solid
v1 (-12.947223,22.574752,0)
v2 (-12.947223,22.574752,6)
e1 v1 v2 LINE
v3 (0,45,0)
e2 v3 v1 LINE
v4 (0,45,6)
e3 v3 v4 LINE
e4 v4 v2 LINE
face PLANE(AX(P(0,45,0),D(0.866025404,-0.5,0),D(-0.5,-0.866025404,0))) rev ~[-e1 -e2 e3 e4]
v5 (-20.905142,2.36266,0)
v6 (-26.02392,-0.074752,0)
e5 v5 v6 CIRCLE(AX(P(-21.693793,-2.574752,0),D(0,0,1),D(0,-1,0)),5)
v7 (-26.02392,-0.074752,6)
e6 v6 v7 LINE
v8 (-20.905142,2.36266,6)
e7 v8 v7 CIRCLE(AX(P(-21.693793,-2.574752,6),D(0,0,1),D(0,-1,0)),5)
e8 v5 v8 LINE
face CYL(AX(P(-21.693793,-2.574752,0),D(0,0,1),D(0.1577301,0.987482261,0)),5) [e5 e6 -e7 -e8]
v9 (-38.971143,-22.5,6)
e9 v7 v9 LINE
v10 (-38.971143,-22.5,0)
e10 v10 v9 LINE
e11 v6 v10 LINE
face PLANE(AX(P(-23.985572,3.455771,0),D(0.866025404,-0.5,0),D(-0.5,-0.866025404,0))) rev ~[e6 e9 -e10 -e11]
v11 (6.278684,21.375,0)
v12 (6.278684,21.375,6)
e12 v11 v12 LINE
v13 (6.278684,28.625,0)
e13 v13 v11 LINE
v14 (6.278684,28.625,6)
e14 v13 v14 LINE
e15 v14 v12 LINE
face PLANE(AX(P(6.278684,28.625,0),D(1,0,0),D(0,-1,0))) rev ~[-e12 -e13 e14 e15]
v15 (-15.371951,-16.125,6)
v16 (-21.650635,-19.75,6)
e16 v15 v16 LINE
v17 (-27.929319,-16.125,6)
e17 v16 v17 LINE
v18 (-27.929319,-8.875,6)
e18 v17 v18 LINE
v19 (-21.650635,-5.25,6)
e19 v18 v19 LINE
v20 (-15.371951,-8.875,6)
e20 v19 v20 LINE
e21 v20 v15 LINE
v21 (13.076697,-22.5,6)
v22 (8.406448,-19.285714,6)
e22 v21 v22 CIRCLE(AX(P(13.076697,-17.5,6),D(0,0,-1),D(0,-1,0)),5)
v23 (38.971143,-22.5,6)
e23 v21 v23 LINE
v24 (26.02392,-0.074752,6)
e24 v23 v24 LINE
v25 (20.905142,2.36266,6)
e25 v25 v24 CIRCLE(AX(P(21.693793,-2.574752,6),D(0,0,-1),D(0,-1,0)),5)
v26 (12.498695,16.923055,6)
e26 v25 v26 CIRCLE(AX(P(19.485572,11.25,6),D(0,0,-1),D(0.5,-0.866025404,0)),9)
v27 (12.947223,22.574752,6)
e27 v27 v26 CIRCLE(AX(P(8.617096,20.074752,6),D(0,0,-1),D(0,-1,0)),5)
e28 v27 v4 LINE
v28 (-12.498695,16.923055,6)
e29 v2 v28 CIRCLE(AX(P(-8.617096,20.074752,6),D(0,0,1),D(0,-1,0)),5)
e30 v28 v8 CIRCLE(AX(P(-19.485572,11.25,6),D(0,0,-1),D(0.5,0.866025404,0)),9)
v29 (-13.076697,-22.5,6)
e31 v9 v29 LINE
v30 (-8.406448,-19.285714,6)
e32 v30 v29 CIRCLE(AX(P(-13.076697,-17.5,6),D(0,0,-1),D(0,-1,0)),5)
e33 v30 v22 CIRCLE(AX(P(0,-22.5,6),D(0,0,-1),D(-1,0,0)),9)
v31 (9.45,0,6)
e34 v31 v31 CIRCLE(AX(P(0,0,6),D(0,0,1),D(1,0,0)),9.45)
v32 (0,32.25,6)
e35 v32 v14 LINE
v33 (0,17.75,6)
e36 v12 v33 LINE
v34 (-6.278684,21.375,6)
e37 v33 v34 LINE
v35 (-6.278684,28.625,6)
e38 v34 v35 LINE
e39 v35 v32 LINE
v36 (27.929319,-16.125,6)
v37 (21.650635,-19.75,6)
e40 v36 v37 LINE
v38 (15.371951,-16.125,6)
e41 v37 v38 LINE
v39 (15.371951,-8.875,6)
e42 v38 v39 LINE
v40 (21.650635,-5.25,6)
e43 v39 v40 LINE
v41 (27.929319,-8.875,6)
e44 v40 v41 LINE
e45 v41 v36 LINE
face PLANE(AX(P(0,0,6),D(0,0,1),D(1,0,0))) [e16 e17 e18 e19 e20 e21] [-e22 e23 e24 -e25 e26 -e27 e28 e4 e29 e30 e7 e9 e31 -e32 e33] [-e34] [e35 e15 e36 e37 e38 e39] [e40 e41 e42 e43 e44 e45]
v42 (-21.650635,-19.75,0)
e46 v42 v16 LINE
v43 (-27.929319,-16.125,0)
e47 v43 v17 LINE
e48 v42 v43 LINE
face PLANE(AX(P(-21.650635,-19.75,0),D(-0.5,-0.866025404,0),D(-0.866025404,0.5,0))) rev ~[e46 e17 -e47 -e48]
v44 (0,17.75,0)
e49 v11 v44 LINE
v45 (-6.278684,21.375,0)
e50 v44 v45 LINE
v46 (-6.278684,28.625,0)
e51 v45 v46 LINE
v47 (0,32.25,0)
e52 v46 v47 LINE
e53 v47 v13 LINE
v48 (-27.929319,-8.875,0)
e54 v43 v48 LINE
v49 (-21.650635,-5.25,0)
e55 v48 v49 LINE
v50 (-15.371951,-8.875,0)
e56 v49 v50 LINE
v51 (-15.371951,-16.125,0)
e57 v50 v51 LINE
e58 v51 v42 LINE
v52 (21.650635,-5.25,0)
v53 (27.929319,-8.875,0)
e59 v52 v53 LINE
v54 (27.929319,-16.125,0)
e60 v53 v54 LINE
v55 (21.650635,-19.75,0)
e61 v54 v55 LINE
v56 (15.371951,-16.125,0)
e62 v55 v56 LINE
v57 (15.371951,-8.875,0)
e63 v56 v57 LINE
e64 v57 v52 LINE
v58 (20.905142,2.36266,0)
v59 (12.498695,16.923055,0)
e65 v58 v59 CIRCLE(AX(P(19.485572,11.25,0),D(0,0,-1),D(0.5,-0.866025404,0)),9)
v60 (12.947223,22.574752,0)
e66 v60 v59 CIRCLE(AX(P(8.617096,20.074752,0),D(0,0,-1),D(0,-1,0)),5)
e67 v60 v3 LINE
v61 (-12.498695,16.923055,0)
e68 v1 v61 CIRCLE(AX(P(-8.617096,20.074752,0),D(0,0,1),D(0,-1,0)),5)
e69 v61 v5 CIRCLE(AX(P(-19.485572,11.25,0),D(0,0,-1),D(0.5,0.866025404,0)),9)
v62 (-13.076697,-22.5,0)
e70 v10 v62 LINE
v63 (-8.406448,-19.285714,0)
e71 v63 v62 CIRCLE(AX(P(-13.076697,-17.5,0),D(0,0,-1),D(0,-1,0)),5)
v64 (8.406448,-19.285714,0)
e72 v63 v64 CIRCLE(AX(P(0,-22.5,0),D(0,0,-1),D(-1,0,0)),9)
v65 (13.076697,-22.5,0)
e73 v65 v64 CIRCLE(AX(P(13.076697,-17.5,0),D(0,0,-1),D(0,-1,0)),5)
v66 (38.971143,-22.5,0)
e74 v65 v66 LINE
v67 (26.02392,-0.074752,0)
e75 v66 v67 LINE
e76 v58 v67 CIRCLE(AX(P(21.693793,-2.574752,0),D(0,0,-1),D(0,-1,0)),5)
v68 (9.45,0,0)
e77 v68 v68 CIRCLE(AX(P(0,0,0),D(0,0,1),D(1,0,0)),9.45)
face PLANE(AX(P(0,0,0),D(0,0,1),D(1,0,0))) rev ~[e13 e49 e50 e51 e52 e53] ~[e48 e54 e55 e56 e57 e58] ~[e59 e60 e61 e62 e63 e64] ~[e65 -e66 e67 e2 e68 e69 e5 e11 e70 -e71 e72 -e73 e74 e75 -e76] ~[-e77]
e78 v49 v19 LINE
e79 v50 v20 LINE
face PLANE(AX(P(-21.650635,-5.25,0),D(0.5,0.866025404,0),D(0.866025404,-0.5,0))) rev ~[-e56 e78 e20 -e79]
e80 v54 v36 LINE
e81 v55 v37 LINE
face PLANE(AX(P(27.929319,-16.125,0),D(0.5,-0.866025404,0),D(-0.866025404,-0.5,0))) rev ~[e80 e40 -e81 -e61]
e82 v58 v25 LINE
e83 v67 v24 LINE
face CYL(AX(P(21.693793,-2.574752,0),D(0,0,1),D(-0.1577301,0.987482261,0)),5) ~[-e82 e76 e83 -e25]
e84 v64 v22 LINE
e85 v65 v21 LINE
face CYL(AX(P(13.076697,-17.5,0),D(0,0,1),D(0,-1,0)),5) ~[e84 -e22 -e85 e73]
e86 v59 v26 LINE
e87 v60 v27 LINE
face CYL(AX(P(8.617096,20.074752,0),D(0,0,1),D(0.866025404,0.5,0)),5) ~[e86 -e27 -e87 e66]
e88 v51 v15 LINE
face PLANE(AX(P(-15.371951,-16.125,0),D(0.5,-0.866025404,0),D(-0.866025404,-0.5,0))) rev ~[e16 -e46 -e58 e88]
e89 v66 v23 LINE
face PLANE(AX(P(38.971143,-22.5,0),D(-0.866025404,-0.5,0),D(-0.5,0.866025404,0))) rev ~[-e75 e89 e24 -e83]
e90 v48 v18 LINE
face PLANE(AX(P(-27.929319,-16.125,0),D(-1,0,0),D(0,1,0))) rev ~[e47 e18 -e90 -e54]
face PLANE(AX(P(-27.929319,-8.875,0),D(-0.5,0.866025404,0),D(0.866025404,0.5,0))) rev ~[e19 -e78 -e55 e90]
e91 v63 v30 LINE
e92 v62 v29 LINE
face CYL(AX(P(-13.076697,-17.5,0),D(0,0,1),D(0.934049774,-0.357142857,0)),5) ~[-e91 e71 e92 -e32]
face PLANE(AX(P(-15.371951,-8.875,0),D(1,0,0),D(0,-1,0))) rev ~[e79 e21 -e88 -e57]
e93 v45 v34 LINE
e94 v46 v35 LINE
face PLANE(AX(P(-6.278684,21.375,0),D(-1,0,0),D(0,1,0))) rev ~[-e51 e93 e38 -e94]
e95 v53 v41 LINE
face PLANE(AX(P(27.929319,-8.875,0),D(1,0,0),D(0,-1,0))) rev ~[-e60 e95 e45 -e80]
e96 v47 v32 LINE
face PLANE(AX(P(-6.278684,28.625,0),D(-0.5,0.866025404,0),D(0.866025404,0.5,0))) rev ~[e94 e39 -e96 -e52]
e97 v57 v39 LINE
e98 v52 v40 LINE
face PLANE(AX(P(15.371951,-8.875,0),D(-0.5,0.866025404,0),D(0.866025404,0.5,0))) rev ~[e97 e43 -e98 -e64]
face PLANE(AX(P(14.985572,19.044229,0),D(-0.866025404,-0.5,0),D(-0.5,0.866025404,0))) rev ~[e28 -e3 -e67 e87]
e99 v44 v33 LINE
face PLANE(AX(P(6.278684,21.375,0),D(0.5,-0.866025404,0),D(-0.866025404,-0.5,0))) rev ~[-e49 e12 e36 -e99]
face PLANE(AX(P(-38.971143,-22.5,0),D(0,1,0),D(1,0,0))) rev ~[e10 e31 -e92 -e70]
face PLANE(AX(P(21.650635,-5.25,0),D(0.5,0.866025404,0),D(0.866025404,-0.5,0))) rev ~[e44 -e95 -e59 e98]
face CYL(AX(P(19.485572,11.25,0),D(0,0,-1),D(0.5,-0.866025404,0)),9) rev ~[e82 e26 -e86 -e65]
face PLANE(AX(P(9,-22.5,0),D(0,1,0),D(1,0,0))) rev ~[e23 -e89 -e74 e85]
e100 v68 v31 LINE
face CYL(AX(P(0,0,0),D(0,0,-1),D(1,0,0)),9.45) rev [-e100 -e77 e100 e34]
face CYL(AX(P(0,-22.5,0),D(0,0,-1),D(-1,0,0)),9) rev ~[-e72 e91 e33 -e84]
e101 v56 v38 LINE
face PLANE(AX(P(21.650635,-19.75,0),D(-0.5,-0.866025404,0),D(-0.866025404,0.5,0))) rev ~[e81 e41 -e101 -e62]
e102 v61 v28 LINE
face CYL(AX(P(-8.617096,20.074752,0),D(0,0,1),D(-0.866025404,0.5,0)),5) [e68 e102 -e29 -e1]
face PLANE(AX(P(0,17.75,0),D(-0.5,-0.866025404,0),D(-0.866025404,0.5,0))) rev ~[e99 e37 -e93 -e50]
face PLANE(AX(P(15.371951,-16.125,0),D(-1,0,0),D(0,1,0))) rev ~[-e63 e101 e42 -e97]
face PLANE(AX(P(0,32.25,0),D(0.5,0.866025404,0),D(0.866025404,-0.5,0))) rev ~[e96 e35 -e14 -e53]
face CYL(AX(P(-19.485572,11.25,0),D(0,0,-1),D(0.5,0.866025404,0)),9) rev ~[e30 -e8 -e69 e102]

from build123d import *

# Parameters (mm, degrees)
F0_R     = 9.45
F1_DEPTH = 6
F2_R     = 5


with BuildPart() as f1:
    # F0 (on Top) → F1 (new body)
    with BuildSketch(Plane.XY):
        with BuildLine():
            Line((14.9855715851, 19.0442286341), (0, 45))
            Line((0, 45), (-14.9855715851, 19.0442286341))
            ThreePointArc((-14.9855715851, 19.0442286341), (-11.6913429511, 6.75), (-23.9855715851, 3.4557713659))
            Line((-23.9855715851, 3.4557713659), (-38.9711431703, -22.5))
            Line((-38.9711431703, -22.5), (-9, -22.5))
            ThreePointArc((-9, -22.5), (0, -13.5), (9, -22.5))
            Line((9, -22.5), (38.9711431703, -22.5))
            Line((38.9711431703, -22.5), (23.9855715851, 3.4557713659))
            ThreePointArc((23.9855715851, 3.4557713659), (11.6913429511, 6.75), (14.9855715851, 19.0442286341))
        make_face()
        Polygon((-15.3719509172, -16.125), (-21.6506350946, -19.75), (-27.929319272, -16.125), (-27.929319272, -8.875), (-21.6506350946, -5.25), (-15.3719509172, -8.875), align=None, mode=Mode.SUBTRACT)
        Polygon((21.6506350946, -5.25), (27.929319272, -8.875), (27.929319272, -16.125), (21.6506350946, -19.75), (15.3719509172, -16.125), (15.3719509172, -8.875), align=None, mode=Mode.SUBTRACT)
        Circle(F0_R, mode=Mode.SUBTRACT)
        Polygon((-6.2786841774, 28.625), (0, 32.25), (6.2786841774, 28.625), (6.2786841774, 21.375), (0, 17.75), (-6.2786841774, 21.375), align=None, mode=Mode.SUBTRACT)
    extrude(amount=F1_DEPTH)

    # F2
    f2_edges = [f1.edges().sort_by_distance(p)[0] for p in [
        (14.985572, 19.044229, 3),
        (-23.985572, 3.455771, 3),
        (9, -22.5, 3),
        (-14.985572, 19.044229, 3),
        (-9, -22.5, 3),
        (23.985572, 3.455771, 3),
    ]]
    fillet(f2_edges, radius=F2_R)


solid = f1.part
